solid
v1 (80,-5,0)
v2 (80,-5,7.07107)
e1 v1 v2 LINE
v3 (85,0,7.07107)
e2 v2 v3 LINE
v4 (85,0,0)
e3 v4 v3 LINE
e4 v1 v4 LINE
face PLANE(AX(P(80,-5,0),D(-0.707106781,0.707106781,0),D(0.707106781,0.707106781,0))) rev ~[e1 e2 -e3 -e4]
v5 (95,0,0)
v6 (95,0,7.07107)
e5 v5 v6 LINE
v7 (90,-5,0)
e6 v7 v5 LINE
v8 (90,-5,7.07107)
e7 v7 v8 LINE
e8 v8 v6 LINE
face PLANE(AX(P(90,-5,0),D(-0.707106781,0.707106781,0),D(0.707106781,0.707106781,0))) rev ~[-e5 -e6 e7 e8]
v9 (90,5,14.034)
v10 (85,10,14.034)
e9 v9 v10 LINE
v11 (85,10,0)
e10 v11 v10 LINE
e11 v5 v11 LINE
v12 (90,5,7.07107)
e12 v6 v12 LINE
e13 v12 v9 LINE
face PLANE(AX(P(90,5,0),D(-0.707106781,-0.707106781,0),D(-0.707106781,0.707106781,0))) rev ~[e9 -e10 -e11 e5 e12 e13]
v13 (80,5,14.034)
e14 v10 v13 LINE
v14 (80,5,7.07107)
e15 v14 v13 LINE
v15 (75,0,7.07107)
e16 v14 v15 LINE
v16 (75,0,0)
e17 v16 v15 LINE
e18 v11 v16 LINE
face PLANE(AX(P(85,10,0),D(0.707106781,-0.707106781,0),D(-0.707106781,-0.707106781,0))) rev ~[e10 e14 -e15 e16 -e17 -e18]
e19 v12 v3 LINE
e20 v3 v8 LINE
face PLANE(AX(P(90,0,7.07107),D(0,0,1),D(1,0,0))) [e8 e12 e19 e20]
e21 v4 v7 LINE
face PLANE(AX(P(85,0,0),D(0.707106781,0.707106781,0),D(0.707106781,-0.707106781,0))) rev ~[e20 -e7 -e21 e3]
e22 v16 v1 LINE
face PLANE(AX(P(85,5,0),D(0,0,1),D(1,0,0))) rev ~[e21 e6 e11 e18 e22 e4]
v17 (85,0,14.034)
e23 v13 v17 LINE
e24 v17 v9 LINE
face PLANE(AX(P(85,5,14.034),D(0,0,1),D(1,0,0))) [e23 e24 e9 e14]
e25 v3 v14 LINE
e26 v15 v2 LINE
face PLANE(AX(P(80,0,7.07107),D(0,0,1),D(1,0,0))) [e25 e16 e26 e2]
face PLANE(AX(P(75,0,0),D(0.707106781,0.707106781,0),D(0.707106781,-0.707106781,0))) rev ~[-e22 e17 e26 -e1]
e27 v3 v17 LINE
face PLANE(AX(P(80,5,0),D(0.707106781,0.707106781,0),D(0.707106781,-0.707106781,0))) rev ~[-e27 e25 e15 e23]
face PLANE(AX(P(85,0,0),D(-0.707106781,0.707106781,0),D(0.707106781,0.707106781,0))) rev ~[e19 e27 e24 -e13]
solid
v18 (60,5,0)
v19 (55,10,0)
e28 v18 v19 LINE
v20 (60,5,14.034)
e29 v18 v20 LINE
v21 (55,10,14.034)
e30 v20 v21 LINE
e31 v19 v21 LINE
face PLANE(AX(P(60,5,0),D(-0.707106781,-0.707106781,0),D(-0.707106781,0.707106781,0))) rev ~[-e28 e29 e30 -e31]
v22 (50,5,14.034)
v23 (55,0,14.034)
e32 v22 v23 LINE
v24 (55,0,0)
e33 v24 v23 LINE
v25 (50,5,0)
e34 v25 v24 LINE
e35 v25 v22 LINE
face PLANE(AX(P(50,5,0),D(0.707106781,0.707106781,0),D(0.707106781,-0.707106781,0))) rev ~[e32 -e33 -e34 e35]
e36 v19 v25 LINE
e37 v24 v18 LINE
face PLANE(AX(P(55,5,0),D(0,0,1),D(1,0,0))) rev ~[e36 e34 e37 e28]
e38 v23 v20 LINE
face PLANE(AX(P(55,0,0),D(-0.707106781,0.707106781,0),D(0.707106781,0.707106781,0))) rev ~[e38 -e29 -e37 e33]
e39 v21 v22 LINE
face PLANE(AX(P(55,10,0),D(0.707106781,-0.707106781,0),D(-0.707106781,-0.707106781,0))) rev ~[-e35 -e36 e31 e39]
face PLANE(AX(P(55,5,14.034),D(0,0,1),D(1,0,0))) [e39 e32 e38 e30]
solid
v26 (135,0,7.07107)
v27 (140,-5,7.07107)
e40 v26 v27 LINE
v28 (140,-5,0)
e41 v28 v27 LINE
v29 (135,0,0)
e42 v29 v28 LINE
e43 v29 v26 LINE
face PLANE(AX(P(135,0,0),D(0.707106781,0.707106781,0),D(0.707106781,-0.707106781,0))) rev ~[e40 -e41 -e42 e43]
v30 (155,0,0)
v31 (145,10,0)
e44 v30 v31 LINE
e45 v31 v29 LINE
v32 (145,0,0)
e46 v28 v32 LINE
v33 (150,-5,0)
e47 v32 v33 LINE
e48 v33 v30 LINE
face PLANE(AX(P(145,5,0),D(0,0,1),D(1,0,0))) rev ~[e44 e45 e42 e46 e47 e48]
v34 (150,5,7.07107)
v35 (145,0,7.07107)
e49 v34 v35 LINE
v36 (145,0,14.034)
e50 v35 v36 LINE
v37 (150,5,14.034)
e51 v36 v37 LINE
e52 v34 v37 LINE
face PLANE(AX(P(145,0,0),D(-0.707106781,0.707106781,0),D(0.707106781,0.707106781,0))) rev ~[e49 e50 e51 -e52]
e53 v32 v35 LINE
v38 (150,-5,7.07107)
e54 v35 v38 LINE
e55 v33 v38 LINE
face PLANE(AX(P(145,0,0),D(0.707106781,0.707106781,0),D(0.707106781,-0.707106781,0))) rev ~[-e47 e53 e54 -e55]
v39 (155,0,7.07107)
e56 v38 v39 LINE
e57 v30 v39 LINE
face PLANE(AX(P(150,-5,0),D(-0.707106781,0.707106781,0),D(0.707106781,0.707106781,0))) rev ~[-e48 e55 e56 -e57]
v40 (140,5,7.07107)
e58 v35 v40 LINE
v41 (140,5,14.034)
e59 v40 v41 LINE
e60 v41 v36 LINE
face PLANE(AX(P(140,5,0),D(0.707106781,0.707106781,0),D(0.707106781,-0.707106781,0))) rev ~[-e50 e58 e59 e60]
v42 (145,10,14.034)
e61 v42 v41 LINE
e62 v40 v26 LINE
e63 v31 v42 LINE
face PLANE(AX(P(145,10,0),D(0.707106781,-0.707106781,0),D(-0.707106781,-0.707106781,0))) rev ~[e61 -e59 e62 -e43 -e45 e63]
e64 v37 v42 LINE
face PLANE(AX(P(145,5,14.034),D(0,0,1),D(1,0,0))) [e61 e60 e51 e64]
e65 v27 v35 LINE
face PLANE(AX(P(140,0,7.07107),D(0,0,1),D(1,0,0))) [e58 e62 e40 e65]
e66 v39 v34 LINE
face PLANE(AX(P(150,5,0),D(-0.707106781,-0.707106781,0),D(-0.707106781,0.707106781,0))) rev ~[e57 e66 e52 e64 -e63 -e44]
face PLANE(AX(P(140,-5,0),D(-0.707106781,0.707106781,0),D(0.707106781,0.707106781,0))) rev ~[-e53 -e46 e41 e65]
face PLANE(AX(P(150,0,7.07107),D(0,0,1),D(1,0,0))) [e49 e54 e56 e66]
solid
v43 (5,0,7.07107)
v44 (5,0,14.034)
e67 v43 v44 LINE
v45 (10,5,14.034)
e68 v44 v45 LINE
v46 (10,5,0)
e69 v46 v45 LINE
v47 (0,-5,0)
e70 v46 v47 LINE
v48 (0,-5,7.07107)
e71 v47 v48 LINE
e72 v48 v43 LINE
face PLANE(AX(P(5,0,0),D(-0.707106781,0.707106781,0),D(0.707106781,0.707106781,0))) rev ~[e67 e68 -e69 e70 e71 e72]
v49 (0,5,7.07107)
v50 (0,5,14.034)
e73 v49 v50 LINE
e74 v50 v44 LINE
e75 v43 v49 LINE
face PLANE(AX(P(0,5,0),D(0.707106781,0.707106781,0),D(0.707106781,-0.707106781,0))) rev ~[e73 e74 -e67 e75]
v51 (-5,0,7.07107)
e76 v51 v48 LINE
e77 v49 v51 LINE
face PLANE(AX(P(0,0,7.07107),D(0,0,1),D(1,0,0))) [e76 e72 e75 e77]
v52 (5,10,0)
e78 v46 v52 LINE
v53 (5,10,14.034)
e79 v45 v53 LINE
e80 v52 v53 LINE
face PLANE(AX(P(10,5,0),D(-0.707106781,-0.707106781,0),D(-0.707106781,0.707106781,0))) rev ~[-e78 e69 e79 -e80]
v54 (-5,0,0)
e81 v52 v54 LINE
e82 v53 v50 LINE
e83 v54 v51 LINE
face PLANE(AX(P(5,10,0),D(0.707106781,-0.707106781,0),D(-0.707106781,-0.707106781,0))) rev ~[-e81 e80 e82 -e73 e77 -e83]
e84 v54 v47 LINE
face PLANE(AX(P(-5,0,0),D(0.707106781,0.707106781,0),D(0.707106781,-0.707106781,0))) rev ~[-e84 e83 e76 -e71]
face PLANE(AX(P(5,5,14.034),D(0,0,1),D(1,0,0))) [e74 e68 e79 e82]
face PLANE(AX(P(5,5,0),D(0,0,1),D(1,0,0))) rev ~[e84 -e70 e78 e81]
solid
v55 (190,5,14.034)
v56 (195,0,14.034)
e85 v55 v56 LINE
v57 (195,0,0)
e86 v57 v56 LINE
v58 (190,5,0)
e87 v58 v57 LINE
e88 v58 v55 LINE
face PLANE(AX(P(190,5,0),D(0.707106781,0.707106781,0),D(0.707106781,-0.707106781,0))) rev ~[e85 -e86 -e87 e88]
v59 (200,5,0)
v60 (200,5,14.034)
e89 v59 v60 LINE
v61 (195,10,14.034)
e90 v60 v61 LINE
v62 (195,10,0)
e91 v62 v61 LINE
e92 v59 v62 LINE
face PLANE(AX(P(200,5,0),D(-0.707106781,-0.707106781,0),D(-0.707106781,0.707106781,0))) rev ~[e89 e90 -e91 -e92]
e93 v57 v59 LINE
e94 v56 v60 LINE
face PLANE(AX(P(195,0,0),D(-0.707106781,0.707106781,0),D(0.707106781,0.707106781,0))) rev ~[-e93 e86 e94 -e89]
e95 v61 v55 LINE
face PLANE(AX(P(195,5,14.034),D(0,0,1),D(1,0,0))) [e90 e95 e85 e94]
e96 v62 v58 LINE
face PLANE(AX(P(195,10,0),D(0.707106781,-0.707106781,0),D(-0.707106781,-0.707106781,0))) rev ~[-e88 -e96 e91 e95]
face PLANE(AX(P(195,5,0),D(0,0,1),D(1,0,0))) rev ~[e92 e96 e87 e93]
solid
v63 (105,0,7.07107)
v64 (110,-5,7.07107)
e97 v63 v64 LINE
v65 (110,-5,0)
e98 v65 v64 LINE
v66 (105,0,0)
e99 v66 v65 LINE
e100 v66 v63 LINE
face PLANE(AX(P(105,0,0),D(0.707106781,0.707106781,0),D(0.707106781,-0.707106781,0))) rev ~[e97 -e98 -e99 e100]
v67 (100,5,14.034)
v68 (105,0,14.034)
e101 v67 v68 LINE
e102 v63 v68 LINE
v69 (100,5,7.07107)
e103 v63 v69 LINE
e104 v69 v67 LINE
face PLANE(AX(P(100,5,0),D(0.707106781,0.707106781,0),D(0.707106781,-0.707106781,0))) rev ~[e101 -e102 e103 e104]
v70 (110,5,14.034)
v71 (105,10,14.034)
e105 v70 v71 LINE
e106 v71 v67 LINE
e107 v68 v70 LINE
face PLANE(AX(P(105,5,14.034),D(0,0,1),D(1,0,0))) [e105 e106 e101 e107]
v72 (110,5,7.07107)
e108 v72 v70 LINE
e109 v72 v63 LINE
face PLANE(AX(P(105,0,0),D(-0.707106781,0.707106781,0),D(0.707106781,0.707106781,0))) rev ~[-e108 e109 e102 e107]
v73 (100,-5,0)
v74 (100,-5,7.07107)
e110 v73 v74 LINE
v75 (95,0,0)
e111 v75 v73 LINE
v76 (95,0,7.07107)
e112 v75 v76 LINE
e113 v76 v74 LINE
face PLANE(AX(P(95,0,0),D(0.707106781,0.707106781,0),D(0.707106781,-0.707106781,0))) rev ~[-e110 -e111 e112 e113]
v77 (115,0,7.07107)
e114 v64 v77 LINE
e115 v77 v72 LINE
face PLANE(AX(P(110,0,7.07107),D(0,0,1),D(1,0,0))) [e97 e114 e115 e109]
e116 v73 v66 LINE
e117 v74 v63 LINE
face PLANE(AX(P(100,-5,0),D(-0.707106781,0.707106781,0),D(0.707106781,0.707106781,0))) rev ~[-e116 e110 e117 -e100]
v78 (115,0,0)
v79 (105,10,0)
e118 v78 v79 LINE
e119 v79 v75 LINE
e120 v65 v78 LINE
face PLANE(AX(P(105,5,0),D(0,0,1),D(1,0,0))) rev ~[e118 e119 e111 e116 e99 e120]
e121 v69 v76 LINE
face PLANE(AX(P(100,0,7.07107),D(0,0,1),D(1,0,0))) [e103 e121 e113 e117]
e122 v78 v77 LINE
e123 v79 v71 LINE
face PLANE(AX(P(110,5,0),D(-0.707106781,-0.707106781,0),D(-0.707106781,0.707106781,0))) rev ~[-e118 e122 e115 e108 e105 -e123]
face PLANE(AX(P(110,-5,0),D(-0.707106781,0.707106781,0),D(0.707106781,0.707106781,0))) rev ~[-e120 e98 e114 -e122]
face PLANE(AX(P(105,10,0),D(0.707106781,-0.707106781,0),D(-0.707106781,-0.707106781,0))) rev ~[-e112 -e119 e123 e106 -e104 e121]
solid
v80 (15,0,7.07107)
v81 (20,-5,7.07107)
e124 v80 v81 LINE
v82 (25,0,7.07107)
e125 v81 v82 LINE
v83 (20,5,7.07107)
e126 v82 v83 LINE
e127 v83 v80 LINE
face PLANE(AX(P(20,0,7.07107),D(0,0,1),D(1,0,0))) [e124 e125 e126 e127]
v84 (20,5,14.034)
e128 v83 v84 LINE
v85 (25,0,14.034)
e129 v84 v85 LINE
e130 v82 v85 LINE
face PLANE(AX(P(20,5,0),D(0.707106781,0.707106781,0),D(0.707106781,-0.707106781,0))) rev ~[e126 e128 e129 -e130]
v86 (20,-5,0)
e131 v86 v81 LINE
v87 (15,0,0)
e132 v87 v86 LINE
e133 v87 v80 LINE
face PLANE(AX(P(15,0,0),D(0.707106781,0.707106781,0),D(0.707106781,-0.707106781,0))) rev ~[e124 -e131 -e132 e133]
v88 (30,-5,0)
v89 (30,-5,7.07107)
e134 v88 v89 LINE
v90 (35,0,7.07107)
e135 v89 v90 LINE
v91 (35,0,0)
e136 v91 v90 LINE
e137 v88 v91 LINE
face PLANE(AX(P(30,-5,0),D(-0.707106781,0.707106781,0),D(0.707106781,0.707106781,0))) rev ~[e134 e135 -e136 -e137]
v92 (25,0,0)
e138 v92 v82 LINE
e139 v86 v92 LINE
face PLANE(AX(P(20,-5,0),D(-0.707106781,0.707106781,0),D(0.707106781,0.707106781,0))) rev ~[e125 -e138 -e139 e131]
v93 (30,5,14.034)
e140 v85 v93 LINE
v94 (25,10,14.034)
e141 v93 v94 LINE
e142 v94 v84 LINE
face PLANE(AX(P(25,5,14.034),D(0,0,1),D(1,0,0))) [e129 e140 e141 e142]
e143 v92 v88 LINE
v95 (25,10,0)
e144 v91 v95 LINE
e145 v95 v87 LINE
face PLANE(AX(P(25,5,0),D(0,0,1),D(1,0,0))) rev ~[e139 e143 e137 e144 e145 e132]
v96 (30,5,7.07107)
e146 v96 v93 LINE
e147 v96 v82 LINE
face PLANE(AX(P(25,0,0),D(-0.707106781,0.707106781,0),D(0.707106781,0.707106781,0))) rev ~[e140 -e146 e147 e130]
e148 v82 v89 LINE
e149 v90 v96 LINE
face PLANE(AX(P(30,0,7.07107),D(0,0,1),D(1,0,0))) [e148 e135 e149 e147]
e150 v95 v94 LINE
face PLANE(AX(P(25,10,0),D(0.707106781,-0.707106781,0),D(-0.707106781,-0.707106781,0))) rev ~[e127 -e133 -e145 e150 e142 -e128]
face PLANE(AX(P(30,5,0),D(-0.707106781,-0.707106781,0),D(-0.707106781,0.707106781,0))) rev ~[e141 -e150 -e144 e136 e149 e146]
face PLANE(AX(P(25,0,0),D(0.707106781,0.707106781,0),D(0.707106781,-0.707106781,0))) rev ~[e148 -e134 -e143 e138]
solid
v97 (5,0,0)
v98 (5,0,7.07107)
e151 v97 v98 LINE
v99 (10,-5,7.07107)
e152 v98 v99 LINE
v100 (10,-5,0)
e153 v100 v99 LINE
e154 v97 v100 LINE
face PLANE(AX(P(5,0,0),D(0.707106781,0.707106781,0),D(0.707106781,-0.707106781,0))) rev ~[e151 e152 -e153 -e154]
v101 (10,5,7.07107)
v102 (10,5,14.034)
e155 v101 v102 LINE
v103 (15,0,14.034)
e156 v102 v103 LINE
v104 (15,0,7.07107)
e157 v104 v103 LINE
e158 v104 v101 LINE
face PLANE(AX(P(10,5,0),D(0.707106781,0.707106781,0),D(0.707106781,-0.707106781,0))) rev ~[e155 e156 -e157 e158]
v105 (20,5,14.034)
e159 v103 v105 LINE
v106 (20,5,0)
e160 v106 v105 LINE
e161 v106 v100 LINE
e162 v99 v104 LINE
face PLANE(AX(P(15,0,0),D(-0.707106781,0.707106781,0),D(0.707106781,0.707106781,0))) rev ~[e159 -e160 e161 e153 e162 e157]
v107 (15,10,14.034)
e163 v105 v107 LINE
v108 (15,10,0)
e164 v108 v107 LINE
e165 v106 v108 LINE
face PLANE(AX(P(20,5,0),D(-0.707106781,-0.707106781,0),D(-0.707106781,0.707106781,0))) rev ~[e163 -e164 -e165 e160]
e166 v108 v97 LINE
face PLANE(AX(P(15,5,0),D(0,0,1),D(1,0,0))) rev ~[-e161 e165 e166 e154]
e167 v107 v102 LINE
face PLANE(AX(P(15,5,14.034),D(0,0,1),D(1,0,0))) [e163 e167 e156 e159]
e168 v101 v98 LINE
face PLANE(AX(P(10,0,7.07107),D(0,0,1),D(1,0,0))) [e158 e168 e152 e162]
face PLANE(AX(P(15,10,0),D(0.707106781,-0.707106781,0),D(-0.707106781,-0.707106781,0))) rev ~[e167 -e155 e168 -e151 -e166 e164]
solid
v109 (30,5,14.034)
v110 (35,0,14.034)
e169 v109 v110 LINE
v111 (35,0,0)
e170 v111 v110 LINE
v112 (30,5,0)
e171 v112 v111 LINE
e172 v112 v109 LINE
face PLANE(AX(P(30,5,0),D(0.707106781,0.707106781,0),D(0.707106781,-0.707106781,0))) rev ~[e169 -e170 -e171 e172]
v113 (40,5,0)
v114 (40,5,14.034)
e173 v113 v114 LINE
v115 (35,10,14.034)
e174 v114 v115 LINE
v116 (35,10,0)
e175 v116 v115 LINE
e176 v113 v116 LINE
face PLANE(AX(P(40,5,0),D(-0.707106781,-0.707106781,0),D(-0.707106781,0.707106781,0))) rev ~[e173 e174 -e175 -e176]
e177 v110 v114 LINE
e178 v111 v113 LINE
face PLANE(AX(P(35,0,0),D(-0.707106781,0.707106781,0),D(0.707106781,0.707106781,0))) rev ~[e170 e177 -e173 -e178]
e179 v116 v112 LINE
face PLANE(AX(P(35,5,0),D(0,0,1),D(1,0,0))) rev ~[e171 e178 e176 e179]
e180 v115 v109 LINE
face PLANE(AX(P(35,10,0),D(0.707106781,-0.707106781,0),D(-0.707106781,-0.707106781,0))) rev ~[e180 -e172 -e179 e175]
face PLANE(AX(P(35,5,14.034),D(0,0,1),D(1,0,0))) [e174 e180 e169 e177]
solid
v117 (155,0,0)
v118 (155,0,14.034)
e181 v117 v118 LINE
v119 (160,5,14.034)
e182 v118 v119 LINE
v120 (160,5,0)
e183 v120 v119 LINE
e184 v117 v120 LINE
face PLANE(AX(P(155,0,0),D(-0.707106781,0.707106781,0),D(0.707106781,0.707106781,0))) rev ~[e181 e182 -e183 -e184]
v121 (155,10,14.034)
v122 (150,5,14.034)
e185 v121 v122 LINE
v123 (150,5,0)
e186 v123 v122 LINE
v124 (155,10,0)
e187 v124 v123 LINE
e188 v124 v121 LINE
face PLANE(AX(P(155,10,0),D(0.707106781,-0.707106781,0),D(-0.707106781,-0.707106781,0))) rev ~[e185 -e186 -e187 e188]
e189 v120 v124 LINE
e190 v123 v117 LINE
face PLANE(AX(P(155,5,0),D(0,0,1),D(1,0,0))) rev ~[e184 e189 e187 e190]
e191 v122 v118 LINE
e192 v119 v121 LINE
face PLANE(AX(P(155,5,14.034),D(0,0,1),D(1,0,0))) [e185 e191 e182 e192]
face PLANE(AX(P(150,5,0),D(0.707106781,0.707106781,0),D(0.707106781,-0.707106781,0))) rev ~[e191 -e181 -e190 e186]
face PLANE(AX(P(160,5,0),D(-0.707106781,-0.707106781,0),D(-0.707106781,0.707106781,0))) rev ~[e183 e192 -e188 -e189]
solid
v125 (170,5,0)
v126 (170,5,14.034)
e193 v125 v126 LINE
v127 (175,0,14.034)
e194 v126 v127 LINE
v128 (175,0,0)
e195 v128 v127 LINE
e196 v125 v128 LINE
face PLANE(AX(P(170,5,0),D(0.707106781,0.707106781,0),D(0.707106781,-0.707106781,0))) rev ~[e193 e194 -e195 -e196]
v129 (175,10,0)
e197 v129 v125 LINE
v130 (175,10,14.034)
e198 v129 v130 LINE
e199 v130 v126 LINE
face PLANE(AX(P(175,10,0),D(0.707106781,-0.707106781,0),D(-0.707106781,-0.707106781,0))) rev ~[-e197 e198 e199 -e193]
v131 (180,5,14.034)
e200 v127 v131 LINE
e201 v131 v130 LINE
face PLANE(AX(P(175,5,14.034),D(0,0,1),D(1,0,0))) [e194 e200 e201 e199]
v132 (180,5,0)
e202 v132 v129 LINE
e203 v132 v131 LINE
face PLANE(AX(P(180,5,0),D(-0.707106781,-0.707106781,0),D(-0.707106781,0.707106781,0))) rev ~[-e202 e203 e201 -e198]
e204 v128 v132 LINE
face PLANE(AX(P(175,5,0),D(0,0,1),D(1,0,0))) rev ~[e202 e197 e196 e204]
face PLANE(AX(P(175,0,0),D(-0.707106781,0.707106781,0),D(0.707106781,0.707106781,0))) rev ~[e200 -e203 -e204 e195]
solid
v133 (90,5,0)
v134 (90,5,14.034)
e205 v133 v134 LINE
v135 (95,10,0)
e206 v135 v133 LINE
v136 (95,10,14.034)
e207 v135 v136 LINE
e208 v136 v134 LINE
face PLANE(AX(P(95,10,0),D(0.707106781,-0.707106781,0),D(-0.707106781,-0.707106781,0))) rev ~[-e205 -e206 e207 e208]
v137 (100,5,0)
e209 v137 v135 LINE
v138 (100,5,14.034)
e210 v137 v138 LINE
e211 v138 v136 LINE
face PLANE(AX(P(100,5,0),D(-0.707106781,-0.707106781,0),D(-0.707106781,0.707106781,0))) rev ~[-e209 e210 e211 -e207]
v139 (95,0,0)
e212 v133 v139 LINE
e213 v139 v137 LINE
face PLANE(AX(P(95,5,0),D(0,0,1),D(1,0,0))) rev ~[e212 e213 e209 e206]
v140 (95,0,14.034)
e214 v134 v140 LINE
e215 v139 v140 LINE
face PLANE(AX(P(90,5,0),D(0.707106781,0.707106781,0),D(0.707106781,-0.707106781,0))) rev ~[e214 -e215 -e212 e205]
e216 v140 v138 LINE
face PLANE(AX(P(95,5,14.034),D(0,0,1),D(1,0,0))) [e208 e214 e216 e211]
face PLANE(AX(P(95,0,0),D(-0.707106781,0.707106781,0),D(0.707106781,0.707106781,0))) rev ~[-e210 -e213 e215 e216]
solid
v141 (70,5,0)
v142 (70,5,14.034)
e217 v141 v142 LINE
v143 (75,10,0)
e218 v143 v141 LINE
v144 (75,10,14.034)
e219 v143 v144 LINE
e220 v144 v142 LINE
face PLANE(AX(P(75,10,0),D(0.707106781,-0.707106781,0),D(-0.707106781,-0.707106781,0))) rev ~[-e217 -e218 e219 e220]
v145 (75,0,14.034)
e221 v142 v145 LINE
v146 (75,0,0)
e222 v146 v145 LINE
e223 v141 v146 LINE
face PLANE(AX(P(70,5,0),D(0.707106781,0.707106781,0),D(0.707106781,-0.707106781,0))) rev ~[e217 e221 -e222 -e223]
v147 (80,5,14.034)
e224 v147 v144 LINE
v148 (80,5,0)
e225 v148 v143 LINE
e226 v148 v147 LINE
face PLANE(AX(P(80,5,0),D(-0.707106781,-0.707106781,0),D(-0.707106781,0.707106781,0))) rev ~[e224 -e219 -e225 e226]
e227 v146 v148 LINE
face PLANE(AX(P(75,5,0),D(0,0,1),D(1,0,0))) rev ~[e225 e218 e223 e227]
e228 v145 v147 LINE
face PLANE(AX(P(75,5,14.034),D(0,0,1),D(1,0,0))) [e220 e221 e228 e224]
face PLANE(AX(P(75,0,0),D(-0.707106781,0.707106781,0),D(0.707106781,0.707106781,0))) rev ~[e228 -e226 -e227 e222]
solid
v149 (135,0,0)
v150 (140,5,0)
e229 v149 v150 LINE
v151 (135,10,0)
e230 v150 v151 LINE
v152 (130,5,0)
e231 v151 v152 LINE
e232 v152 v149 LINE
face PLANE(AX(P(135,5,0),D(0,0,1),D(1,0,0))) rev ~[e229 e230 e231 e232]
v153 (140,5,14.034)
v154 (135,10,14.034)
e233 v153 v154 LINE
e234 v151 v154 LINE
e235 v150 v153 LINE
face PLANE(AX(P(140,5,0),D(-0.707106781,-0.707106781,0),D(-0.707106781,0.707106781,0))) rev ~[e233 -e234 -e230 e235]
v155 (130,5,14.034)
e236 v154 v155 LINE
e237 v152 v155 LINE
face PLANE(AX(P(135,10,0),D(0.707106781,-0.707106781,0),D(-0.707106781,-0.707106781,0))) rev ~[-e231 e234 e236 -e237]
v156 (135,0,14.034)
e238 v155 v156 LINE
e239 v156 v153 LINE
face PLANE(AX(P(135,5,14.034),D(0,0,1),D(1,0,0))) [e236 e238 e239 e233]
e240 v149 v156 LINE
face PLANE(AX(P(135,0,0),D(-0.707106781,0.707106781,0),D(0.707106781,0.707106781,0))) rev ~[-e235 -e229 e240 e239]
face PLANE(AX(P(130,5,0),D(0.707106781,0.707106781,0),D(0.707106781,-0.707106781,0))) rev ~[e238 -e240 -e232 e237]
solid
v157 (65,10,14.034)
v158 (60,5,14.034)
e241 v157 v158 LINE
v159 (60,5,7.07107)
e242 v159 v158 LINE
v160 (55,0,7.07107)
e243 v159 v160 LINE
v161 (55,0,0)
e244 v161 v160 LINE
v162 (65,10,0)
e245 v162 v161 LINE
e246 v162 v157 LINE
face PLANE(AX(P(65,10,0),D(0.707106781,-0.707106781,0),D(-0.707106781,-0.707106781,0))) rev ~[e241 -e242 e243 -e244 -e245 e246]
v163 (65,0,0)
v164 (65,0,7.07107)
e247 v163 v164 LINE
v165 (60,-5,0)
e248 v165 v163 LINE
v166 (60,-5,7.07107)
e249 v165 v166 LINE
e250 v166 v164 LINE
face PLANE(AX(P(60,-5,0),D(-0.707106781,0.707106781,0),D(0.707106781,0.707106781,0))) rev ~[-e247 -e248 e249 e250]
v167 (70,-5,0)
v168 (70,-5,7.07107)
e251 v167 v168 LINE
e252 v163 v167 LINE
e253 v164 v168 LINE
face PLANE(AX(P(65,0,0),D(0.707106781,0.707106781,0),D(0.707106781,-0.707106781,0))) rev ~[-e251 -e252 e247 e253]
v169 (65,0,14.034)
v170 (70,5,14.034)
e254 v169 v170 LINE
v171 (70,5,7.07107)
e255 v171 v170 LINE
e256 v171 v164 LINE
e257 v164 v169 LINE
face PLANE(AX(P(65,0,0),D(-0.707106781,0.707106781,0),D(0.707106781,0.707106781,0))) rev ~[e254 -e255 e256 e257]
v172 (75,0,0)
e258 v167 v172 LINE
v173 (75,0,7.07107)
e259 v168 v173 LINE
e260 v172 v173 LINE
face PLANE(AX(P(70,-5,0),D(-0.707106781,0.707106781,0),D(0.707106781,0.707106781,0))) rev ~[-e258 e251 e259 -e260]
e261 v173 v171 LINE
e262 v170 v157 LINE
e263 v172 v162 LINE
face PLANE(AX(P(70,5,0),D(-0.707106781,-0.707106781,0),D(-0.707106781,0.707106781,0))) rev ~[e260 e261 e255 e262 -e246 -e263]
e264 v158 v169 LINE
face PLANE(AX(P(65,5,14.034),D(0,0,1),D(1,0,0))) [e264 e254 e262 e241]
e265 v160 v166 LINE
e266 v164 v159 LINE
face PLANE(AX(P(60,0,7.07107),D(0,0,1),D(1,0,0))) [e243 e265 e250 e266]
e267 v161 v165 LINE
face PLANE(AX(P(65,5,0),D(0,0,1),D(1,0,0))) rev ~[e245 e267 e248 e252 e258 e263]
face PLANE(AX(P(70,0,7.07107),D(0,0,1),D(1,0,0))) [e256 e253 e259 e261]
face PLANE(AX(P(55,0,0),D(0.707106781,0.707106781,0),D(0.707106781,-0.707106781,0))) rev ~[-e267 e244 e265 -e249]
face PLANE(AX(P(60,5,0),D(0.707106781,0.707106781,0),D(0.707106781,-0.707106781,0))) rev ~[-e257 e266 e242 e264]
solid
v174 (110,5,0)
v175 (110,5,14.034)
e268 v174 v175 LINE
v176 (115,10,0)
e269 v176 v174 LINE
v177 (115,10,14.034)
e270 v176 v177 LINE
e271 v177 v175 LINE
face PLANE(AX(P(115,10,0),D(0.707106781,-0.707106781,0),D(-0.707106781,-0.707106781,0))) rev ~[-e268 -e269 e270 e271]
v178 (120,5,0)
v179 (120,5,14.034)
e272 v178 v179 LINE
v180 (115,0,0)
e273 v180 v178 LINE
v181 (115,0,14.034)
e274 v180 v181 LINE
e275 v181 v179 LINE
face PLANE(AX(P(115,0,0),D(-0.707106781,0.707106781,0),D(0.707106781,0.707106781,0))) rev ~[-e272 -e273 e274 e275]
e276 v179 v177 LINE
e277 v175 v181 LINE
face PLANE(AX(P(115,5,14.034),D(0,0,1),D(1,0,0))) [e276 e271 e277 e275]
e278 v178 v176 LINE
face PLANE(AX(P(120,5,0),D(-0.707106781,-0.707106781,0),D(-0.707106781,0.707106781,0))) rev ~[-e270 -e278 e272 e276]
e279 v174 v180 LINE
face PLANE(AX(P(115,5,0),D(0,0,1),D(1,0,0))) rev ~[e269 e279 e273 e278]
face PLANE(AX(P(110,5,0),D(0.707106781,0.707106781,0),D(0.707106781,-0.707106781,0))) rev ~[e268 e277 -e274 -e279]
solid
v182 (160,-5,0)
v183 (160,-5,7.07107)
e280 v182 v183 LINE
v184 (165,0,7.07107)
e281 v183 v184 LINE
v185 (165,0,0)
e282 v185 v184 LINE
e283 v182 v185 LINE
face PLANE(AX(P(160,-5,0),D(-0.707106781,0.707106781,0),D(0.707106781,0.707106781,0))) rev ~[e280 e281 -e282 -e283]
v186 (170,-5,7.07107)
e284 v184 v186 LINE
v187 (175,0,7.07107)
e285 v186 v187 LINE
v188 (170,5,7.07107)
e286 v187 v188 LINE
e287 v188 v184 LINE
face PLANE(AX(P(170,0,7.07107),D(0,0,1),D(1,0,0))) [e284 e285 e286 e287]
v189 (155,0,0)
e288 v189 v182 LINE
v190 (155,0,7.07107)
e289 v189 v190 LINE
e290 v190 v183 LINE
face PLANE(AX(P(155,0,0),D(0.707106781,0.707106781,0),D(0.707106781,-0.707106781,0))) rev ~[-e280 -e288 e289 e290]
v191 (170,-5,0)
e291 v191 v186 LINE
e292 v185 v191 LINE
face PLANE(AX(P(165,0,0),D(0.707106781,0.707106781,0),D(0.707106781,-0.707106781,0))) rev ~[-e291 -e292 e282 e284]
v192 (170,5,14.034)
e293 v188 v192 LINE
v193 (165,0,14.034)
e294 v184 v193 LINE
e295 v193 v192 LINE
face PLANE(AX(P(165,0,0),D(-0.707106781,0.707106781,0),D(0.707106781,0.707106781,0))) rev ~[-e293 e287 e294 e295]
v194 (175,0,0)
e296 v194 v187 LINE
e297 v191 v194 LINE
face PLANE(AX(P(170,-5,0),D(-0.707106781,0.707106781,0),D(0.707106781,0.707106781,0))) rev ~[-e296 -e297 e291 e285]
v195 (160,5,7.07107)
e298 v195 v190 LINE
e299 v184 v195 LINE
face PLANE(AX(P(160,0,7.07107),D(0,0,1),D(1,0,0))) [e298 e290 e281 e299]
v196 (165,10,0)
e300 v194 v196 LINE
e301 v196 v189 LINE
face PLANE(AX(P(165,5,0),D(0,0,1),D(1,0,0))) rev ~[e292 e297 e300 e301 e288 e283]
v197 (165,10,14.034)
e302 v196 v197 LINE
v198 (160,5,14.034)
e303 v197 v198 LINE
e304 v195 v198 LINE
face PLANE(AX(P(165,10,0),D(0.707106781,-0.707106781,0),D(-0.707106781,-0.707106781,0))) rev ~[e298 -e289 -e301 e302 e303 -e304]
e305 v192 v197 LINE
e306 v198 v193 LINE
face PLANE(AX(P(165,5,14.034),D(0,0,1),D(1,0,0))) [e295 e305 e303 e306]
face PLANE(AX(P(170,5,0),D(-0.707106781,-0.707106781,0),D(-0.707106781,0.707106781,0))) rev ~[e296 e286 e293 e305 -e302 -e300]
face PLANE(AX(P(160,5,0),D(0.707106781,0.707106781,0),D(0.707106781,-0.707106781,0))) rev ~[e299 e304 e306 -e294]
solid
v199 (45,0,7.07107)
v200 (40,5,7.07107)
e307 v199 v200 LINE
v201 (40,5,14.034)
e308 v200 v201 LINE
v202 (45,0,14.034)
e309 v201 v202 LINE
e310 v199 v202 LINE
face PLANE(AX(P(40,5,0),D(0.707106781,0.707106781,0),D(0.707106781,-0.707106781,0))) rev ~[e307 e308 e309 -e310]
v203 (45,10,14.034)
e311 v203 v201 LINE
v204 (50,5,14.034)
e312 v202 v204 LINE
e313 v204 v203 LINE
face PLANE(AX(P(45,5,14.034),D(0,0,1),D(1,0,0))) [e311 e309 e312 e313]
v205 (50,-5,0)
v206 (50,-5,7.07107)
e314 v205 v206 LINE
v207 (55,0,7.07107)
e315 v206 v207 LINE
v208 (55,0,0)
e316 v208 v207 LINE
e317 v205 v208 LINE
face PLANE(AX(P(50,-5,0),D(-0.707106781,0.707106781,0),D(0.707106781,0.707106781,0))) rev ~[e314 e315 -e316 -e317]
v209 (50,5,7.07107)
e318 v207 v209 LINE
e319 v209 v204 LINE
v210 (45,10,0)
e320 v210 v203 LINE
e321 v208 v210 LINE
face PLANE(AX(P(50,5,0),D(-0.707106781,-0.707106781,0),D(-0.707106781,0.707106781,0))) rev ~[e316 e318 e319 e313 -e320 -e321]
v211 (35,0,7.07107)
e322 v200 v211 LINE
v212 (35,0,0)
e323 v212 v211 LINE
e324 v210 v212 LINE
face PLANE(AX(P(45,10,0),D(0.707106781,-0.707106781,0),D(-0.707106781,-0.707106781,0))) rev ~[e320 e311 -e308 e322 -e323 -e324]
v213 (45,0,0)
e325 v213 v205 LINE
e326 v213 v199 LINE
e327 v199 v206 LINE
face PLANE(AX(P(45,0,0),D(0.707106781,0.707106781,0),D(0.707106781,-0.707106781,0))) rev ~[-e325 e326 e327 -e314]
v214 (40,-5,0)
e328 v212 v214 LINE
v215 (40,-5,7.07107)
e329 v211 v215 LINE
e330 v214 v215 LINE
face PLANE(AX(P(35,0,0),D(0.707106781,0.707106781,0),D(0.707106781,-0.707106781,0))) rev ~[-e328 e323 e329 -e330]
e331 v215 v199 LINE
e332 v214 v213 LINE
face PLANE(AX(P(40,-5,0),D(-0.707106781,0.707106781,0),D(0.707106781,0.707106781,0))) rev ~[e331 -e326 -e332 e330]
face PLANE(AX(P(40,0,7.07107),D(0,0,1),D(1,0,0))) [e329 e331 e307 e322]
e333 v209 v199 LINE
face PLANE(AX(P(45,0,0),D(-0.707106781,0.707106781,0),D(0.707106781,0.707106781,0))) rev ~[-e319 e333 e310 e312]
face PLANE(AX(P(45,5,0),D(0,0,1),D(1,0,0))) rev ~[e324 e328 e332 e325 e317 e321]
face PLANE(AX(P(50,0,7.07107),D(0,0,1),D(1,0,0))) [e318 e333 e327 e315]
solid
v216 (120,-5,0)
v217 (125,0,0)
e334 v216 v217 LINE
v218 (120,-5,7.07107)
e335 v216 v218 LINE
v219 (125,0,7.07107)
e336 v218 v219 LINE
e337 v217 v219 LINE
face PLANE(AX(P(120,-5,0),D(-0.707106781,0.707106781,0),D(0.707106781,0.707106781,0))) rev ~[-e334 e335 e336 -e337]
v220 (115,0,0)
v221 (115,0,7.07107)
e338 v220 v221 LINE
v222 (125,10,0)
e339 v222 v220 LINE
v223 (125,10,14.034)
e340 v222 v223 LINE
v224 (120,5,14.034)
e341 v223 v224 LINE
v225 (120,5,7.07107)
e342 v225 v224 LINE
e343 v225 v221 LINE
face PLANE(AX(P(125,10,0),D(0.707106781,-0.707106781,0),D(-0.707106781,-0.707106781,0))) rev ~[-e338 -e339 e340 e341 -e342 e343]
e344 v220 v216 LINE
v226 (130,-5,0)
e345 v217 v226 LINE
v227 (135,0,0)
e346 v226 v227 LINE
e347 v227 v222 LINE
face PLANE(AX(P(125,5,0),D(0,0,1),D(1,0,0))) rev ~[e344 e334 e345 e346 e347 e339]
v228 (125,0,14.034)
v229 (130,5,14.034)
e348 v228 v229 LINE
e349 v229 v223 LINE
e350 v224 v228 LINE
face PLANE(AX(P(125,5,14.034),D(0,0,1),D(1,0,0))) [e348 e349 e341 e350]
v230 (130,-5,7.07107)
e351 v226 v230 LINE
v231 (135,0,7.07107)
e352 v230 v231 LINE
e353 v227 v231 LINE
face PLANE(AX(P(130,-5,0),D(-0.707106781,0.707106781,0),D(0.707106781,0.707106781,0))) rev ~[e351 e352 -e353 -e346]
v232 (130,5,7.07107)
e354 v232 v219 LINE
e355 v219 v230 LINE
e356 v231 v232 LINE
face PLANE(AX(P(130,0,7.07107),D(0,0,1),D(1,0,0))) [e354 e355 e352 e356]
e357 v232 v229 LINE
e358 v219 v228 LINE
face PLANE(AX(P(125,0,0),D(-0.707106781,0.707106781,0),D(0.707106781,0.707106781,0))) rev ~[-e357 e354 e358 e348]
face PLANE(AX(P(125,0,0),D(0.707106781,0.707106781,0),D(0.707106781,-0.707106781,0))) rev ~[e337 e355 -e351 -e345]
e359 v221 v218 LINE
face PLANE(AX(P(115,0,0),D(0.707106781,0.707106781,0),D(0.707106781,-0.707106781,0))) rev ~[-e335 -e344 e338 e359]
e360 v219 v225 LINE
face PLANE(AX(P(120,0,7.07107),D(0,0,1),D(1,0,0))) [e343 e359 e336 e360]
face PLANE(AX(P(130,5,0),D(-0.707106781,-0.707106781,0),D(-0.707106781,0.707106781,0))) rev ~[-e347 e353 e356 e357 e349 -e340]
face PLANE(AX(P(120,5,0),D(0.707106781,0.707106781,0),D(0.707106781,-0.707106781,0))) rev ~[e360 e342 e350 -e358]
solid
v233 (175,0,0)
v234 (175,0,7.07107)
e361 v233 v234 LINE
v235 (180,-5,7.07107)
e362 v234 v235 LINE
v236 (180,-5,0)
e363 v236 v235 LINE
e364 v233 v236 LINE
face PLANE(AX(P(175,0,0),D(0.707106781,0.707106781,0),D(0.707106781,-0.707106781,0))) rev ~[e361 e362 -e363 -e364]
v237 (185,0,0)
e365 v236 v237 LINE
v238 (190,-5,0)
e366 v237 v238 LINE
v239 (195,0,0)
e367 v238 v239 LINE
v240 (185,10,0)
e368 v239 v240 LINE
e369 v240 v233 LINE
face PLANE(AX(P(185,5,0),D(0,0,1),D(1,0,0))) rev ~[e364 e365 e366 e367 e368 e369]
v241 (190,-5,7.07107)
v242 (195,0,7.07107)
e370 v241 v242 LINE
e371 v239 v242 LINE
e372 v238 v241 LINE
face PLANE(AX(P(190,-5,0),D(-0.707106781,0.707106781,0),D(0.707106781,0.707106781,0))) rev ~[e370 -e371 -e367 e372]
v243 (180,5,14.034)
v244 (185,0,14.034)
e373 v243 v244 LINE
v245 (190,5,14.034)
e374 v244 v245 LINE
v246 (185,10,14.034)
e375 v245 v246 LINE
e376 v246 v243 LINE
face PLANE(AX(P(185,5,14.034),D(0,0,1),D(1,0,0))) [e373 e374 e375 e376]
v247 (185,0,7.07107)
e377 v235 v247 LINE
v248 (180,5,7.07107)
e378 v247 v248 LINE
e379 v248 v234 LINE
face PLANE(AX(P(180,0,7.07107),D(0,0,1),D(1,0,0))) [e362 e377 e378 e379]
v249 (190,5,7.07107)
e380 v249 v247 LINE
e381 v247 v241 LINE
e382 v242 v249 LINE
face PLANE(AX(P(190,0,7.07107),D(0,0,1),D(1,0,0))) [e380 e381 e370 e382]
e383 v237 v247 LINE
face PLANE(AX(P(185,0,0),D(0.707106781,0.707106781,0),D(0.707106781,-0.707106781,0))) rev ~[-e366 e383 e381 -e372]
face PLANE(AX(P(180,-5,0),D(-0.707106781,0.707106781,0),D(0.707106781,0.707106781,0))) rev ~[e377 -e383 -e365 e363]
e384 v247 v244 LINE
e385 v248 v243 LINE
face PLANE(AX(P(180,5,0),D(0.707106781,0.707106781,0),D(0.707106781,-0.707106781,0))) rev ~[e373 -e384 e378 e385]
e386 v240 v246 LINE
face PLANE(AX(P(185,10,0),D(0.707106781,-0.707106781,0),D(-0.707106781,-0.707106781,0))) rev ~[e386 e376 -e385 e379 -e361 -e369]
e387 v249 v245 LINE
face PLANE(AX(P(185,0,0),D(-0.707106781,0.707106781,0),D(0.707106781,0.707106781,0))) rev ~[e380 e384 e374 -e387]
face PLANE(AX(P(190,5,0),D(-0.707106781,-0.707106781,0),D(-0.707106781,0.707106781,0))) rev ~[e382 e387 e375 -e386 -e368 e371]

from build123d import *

# Parameters (mm, degrees)
F1_DEPTH = 7.07107
F2_DEPTH = 14.034


with BuildPart() as f1:
    # F0 (on Top) → F1 (new body)
    with BuildSketch(Plane.XY):
        Polygon((5, 0), (0, 5), (-5, 0), (0, -5), align=None)
    extrude(amount=F1_DEPTH)

    # F0 (on Top) → F2, piece 4 (join)
    with BuildSketch(Plane.XY):
        Polygon((5, 10), (0, 5), (5, 0), (10, 5), align=None)
    extrude(amount=F2_DEPTH)


with BuildPart() as f1b:
    # F0 (on Top) → F1, piece 2 (new body)
    with BuildSketch(Plane.XY):
        Polygon((10, 5), (5, 0), (10, -5), (15, 0), align=None)
    extrude(amount=F1_DEPTH)

    # F0 (on Top) → F2 (join)
    with BuildSketch(Plane.XY):
        Polygon((15, 10), (10, 5), (15, 0), (20, 5), align=None)
    extrude(amount=F2_DEPTH)


with BuildPart() as f1c:
    # F0 (on Top) → F1, piece 3 (new body)
    with BuildSketch(Plane.XY):
        Polygon((20, 5), (15, 0), (20, -5), (25, 0), align=None)
    extrude(amount=F1_DEPTH)



with BuildPart() as f1d:
    # F0 (on Top) → F1, piece 4 (new body)
    with BuildSketch(Plane.XY):
        Polygon((30, 5), (25, 0), (30, -5), (35, 0), align=None)
    extrude(amount=F1_DEPTH)


with BuildPart() as f1e:
    # F0 (on Top) → F1, piece 5 (new body)
    with BuildSketch(Plane.XY):
        Polygon((40, 5), (35, 0), (40, -5), (45, 0), align=None)
    extrude(amount=F1_DEPTH)



with BuildPart() as f1f:
    # F0 (on Top) → F1, piece 6 (new body)
    with BuildSketch(Plane.XY):
        Polygon((50, 5), (45, 0), (50, -5), (55, 0), align=None)
    extrude(amount=F1_DEPTH)


with BuildPart() as f1g:
    # F0 (on Top) → F1, piece 7 (new body)
    with BuildSketch(Plane.XY):
        Polygon((60, 5), (55, 0), (60, -5), (65, 0), align=None)
    extrude(amount=F1_DEPTH)



with BuildPart() as f1h:
    # F0 (on Top) → F1, piece 8 (new body)
    with BuildSketch(Plane.XY):
        Polygon((70, 5), (65, 0), (70, -5), (75, 0), align=None)
    extrude(amount=F1_DEPTH)


with BuildPart() as f1i:
    # F0 (on Top) → F1, piece 9 (new body)
    with BuildSketch(Plane.XY):
        Polygon((80, 5), (75, 0), (80, -5), (85, 0), align=None)
    extrude(amount=F1_DEPTH)



with BuildPart() as f1j:
    # F0 (on Top) → F1, piece 10 (new body)
    with BuildSketch(Plane.XY):
        Polygon((90, 5), (85, 0), (90, -5), (95, 0), align=None)
    extrude(amount=F1_DEPTH)


with BuildPart() as f1k:
    # F0 (on Top) → F1, piece 11 (new body)
    with BuildSketch(Plane.XY):
        Polygon((100, 5), (95, 0), (100, -5), (105, 0), align=None)
    extrude(amount=F1_DEPTH)



with BuildPart() as f1l:
    # F0 (on Top) → F1, piece 12 (new body)
    with BuildSketch(Plane.XY):
        Polygon((110, 5), (105, 0), (110, -5), (115, 0), align=None)
    extrude(amount=F1_DEPTH)


with BuildPart() as f1m:
    # F0 (on Top) → F1, piece 13 (new body)
    with BuildSketch(Plane.XY):
        Polygon((120, 5), (115, 0), (120, -5), (125, 0), align=None)
    extrude(amount=F1_DEPTH)



with BuildPart() as f1n:
    # F0 (on Top) → F1, piece 14 (new body)
    with BuildSketch(Plane.XY):
        Polygon((130, 5), (125, 0), (130, -5), (135, 0), align=None)
    extrude(amount=F1_DEPTH)


with BuildPart() as f1o:
    # F0 (on Top) → F1, piece 15 (new body)
    with BuildSketch(Plane.XY):
        Polygon((140, 5), (135, 0), (140, -5), (145, 0), align=None)
    extrude(amount=F1_DEPTH)



with BuildPart() as f1p:
    # F0 (on Top) → F1, piece 16 (new body)
    with BuildSketch(Plane.XY):
        Polygon((150, 5), (145, 0), (150, -5), (155, 0), align=None)
    extrude(amount=F1_DEPTH)


with BuildPart() as f1q:
    # F0 (on Top) → F1, piece 17 (new body)
    with BuildSketch(Plane.XY):
        Polygon((160, 5), (155, 0), (160, -5), (165, 0), align=None)
    extrude(amount=F1_DEPTH)



with BuildPart() as f1r:
    # F0 (on Top) → F1, piece 18 (new body)
    with BuildSketch(Plane.XY):
        Polygon((170, 5), (165, 0), (170, -5), (175, 0), align=None)
    extrude(amount=F1_DEPTH)


with BuildPart() as f1s:
    # F0 (on Top) → F1, piece 19 (new body)
    with BuildSketch(Plane.XY):
        Polygon((180, 5), (175, 0), (180, -5), (185, 0), align=None)
    extrude(amount=F1_DEPTH)



with BuildPart() as f1t:
    # F0 (on Top) → F1, piece 20 (new body)
    with BuildSketch(Plane.XY):
        Polygon((190, 5), (185, 0), (190, -5), (195, 0), align=None)
    extrude(amount=F1_DEPTH)


with BuildPart() as f1c_1:
    add(f1c.part)

    add(f1d.part)  # F2#2 merges F1d
    # F0 (on Top) → F2, piece 2 (join)
    with BuildSketch(Plane.XY):
        Polygon((25, 10), (20, 5), (25, 0), (30, 5), align=None)
    extrude(amount=F2_DEPTH)


with BuildPart() as f2:
    # F0 (on Top) → F2, piece 3 (new body)
    with BuildSketch(Plane.XY):
        Polygon((35, 10), (30, 5), (35, 0), (40, 5), align=None)
    extrude(amount=F2_DEPTH)


with BuildPart() as f1e_1:
    add(f1e.part)

    add(f1f.part)  # F2#5 merges F1f
    # F0 (on Top) → F2, piece 5 (join)
    with BuildSketch(Plane.XY):
        Polygon((45, 10), (40, 5), (45, 0), (50, 5), align=None)
    extrude(amount=F2_DEPTH)


with BuildPart() as f2b:
    # F0 (on Top) → F2, piece 6 (new body)
    with BuildSketch(Plane.XY):
        Polygon((95, 10), (90, 5), (95, 0), (100, 5), align=None)
    extrude(amount=F2_DEPTH)


with BuildPart() as f1k_1:
    add(f1k.part)

    add(f1l.part)  # F2#7 merges F1l
    # F0 (on Top) → F2, piece 7 (join)
    with BuildSketch(Plane.XY):
        Polygon((105, 10), (100, 5), (105, 0), (110, 5), align=None)
    extrude(amount=F2_DEPTH)


with BuildPart() as f2c:
    # F0 (on Top) → F2, piece 8 (new body)
    with BuildSketch(Plane.XY):
        Polygon((115, 10), (110, 5), (115, 0), (120, 5), align=None)
    extrude(amount=F2_DEPTH)


with BuildPart() as f1m_1:
    add(f1m.part)

    add(f1n.part)  # F2#9 merges F1n
    # F0 (on Top) → F2, piece 9 (join)
    with BuildSketch(Plane.XY):
        Polygon((125, 10), (120, 5), (125, 0), (130, 5), align=None)
    extrude(amount=F2_DEPTH)


with BuildPart() as f2d:
    # F0 (on Top) → F2, piece 10 (new body)
    with BuildSketch(Plane.XY):
        Polygon((135, 10), (130, 5), (135, 0), (140, 5), align=None)
    extrude(amount=F2_DEPTH)


with BuildPart() as f1o_1:
    add(f1o.part)

    add(f1p.part)  # F2#11 merges F1p
    # F0 (on Top) → F2, piece 11 (join)
    with BuildSketch(Plane.XY):
        Polygon((145, 10), (140, 5), (145, 0), (150, 5), align=None)
    extrude(amount=F2_DEPTH)


with BuildPart() as f2e:
    # F0 (on Top) → F2, piece 12 (new body)
    with BuildSketch(Plane.XY):
        Polygon((155, 10), (150, 5), (155, 0), (160, 5), align=None)
    extrude(amount=F2_DEPTH)


with BuildPart() as f1q_1:
    add(f1q.part)

    add(f1r.part)  # F2#13 merges F1r
    # F0 (on Top) → F2, piece 13 (join)
    with BuildSketch(Plane.XY):
        Polygon((165, 10), (160, 5), (165, 0), (170, 5), align=None)
    extrude(amount=F2_DEPTH)


with BuildPart() as f2f:
    # F0 (on Top) → F2, piece 14 (new body)
    with BuildSketch(Plane.XY):
        Polygon((175, 10), (170, 5), (175, 0), (180, 5), align=None)
    extrude(amount=F2_DEPTH)


with BuildPart() as f1s_1:
    add(f1s.part)

    add(f1t.part)  # F2#15 merges F1t
    # F0 (on Top) → F2, piece 15 (join)
    with BuildSketch(Plane.XY):
        Polygon((185, 10), (180, 5), (185, 0), (190, 5), align=None)
    extrude(amount=F2_DEPTH)


with BuildPart() as f2g:
    # F0 (on Top) → F2, piece 16 (new body)
    with BuildSketch(Plane.XY):
        Polygon((195, 10), (190, 5), (195, 0), (200, 5), align=None)
    extrude(amount=F2_DEPTH)


with BuildPart() as f1i_1:
    add(f1i.part)

    add(f1j.part)  # F2#17 merges F1j
    # F0 (on Top) → F2, piece 17 (join)
    with BuildSketch(Plane.XY):
        Polygon((85, 10), (80, 5), (85, 0), (90, 5), align=None)
    extrude(amount=F2_DEPTH)


with BuildPart() as f2h:
    # F0 (on Top) → F2, piece 18 (new body)
    with BuildSketch(Plane.XY):
        Polygon((75, 10), (70, 5), (75, 0), (80, 5), align=None)
    extrude(amount=F2_DEPTH)


with BuildPart() as f2i:
    # F0 (on Top) → F2, piece 19 (new body)
    with BuildSketch(Plane.XY):
        Polygon((55, 10), (50, 5), (55, 0), (60, 5), align=None)
    extrude(amount=F2_DEPTH)


with BuildPart() as f1g_1:
    add(f1g.part)

    add(f1h.part)  # F2#20 merges F1h
    # F0 (on Top) → F2, piece 20 (join)
    with BuildSketch(Plane.XY):
        Polygon((65, 10), (60, 5), (65, 0), (70, 5), align=None)
    extrude(amount=F2_DEPTH)


solid = Compound([f1.part, f1b.part, f1c_1.part, f2.part, f1e_1.part, f2b.part, f1k_1.part, f2c.part, f1m_1.part, f2d.part, f1o_1.part, f2e.part, f1q_1.part, f2f.part, f1s_1.part, f2g.part, f1i_1.part, f2h.part, f2i.part, f1g_1.part])
